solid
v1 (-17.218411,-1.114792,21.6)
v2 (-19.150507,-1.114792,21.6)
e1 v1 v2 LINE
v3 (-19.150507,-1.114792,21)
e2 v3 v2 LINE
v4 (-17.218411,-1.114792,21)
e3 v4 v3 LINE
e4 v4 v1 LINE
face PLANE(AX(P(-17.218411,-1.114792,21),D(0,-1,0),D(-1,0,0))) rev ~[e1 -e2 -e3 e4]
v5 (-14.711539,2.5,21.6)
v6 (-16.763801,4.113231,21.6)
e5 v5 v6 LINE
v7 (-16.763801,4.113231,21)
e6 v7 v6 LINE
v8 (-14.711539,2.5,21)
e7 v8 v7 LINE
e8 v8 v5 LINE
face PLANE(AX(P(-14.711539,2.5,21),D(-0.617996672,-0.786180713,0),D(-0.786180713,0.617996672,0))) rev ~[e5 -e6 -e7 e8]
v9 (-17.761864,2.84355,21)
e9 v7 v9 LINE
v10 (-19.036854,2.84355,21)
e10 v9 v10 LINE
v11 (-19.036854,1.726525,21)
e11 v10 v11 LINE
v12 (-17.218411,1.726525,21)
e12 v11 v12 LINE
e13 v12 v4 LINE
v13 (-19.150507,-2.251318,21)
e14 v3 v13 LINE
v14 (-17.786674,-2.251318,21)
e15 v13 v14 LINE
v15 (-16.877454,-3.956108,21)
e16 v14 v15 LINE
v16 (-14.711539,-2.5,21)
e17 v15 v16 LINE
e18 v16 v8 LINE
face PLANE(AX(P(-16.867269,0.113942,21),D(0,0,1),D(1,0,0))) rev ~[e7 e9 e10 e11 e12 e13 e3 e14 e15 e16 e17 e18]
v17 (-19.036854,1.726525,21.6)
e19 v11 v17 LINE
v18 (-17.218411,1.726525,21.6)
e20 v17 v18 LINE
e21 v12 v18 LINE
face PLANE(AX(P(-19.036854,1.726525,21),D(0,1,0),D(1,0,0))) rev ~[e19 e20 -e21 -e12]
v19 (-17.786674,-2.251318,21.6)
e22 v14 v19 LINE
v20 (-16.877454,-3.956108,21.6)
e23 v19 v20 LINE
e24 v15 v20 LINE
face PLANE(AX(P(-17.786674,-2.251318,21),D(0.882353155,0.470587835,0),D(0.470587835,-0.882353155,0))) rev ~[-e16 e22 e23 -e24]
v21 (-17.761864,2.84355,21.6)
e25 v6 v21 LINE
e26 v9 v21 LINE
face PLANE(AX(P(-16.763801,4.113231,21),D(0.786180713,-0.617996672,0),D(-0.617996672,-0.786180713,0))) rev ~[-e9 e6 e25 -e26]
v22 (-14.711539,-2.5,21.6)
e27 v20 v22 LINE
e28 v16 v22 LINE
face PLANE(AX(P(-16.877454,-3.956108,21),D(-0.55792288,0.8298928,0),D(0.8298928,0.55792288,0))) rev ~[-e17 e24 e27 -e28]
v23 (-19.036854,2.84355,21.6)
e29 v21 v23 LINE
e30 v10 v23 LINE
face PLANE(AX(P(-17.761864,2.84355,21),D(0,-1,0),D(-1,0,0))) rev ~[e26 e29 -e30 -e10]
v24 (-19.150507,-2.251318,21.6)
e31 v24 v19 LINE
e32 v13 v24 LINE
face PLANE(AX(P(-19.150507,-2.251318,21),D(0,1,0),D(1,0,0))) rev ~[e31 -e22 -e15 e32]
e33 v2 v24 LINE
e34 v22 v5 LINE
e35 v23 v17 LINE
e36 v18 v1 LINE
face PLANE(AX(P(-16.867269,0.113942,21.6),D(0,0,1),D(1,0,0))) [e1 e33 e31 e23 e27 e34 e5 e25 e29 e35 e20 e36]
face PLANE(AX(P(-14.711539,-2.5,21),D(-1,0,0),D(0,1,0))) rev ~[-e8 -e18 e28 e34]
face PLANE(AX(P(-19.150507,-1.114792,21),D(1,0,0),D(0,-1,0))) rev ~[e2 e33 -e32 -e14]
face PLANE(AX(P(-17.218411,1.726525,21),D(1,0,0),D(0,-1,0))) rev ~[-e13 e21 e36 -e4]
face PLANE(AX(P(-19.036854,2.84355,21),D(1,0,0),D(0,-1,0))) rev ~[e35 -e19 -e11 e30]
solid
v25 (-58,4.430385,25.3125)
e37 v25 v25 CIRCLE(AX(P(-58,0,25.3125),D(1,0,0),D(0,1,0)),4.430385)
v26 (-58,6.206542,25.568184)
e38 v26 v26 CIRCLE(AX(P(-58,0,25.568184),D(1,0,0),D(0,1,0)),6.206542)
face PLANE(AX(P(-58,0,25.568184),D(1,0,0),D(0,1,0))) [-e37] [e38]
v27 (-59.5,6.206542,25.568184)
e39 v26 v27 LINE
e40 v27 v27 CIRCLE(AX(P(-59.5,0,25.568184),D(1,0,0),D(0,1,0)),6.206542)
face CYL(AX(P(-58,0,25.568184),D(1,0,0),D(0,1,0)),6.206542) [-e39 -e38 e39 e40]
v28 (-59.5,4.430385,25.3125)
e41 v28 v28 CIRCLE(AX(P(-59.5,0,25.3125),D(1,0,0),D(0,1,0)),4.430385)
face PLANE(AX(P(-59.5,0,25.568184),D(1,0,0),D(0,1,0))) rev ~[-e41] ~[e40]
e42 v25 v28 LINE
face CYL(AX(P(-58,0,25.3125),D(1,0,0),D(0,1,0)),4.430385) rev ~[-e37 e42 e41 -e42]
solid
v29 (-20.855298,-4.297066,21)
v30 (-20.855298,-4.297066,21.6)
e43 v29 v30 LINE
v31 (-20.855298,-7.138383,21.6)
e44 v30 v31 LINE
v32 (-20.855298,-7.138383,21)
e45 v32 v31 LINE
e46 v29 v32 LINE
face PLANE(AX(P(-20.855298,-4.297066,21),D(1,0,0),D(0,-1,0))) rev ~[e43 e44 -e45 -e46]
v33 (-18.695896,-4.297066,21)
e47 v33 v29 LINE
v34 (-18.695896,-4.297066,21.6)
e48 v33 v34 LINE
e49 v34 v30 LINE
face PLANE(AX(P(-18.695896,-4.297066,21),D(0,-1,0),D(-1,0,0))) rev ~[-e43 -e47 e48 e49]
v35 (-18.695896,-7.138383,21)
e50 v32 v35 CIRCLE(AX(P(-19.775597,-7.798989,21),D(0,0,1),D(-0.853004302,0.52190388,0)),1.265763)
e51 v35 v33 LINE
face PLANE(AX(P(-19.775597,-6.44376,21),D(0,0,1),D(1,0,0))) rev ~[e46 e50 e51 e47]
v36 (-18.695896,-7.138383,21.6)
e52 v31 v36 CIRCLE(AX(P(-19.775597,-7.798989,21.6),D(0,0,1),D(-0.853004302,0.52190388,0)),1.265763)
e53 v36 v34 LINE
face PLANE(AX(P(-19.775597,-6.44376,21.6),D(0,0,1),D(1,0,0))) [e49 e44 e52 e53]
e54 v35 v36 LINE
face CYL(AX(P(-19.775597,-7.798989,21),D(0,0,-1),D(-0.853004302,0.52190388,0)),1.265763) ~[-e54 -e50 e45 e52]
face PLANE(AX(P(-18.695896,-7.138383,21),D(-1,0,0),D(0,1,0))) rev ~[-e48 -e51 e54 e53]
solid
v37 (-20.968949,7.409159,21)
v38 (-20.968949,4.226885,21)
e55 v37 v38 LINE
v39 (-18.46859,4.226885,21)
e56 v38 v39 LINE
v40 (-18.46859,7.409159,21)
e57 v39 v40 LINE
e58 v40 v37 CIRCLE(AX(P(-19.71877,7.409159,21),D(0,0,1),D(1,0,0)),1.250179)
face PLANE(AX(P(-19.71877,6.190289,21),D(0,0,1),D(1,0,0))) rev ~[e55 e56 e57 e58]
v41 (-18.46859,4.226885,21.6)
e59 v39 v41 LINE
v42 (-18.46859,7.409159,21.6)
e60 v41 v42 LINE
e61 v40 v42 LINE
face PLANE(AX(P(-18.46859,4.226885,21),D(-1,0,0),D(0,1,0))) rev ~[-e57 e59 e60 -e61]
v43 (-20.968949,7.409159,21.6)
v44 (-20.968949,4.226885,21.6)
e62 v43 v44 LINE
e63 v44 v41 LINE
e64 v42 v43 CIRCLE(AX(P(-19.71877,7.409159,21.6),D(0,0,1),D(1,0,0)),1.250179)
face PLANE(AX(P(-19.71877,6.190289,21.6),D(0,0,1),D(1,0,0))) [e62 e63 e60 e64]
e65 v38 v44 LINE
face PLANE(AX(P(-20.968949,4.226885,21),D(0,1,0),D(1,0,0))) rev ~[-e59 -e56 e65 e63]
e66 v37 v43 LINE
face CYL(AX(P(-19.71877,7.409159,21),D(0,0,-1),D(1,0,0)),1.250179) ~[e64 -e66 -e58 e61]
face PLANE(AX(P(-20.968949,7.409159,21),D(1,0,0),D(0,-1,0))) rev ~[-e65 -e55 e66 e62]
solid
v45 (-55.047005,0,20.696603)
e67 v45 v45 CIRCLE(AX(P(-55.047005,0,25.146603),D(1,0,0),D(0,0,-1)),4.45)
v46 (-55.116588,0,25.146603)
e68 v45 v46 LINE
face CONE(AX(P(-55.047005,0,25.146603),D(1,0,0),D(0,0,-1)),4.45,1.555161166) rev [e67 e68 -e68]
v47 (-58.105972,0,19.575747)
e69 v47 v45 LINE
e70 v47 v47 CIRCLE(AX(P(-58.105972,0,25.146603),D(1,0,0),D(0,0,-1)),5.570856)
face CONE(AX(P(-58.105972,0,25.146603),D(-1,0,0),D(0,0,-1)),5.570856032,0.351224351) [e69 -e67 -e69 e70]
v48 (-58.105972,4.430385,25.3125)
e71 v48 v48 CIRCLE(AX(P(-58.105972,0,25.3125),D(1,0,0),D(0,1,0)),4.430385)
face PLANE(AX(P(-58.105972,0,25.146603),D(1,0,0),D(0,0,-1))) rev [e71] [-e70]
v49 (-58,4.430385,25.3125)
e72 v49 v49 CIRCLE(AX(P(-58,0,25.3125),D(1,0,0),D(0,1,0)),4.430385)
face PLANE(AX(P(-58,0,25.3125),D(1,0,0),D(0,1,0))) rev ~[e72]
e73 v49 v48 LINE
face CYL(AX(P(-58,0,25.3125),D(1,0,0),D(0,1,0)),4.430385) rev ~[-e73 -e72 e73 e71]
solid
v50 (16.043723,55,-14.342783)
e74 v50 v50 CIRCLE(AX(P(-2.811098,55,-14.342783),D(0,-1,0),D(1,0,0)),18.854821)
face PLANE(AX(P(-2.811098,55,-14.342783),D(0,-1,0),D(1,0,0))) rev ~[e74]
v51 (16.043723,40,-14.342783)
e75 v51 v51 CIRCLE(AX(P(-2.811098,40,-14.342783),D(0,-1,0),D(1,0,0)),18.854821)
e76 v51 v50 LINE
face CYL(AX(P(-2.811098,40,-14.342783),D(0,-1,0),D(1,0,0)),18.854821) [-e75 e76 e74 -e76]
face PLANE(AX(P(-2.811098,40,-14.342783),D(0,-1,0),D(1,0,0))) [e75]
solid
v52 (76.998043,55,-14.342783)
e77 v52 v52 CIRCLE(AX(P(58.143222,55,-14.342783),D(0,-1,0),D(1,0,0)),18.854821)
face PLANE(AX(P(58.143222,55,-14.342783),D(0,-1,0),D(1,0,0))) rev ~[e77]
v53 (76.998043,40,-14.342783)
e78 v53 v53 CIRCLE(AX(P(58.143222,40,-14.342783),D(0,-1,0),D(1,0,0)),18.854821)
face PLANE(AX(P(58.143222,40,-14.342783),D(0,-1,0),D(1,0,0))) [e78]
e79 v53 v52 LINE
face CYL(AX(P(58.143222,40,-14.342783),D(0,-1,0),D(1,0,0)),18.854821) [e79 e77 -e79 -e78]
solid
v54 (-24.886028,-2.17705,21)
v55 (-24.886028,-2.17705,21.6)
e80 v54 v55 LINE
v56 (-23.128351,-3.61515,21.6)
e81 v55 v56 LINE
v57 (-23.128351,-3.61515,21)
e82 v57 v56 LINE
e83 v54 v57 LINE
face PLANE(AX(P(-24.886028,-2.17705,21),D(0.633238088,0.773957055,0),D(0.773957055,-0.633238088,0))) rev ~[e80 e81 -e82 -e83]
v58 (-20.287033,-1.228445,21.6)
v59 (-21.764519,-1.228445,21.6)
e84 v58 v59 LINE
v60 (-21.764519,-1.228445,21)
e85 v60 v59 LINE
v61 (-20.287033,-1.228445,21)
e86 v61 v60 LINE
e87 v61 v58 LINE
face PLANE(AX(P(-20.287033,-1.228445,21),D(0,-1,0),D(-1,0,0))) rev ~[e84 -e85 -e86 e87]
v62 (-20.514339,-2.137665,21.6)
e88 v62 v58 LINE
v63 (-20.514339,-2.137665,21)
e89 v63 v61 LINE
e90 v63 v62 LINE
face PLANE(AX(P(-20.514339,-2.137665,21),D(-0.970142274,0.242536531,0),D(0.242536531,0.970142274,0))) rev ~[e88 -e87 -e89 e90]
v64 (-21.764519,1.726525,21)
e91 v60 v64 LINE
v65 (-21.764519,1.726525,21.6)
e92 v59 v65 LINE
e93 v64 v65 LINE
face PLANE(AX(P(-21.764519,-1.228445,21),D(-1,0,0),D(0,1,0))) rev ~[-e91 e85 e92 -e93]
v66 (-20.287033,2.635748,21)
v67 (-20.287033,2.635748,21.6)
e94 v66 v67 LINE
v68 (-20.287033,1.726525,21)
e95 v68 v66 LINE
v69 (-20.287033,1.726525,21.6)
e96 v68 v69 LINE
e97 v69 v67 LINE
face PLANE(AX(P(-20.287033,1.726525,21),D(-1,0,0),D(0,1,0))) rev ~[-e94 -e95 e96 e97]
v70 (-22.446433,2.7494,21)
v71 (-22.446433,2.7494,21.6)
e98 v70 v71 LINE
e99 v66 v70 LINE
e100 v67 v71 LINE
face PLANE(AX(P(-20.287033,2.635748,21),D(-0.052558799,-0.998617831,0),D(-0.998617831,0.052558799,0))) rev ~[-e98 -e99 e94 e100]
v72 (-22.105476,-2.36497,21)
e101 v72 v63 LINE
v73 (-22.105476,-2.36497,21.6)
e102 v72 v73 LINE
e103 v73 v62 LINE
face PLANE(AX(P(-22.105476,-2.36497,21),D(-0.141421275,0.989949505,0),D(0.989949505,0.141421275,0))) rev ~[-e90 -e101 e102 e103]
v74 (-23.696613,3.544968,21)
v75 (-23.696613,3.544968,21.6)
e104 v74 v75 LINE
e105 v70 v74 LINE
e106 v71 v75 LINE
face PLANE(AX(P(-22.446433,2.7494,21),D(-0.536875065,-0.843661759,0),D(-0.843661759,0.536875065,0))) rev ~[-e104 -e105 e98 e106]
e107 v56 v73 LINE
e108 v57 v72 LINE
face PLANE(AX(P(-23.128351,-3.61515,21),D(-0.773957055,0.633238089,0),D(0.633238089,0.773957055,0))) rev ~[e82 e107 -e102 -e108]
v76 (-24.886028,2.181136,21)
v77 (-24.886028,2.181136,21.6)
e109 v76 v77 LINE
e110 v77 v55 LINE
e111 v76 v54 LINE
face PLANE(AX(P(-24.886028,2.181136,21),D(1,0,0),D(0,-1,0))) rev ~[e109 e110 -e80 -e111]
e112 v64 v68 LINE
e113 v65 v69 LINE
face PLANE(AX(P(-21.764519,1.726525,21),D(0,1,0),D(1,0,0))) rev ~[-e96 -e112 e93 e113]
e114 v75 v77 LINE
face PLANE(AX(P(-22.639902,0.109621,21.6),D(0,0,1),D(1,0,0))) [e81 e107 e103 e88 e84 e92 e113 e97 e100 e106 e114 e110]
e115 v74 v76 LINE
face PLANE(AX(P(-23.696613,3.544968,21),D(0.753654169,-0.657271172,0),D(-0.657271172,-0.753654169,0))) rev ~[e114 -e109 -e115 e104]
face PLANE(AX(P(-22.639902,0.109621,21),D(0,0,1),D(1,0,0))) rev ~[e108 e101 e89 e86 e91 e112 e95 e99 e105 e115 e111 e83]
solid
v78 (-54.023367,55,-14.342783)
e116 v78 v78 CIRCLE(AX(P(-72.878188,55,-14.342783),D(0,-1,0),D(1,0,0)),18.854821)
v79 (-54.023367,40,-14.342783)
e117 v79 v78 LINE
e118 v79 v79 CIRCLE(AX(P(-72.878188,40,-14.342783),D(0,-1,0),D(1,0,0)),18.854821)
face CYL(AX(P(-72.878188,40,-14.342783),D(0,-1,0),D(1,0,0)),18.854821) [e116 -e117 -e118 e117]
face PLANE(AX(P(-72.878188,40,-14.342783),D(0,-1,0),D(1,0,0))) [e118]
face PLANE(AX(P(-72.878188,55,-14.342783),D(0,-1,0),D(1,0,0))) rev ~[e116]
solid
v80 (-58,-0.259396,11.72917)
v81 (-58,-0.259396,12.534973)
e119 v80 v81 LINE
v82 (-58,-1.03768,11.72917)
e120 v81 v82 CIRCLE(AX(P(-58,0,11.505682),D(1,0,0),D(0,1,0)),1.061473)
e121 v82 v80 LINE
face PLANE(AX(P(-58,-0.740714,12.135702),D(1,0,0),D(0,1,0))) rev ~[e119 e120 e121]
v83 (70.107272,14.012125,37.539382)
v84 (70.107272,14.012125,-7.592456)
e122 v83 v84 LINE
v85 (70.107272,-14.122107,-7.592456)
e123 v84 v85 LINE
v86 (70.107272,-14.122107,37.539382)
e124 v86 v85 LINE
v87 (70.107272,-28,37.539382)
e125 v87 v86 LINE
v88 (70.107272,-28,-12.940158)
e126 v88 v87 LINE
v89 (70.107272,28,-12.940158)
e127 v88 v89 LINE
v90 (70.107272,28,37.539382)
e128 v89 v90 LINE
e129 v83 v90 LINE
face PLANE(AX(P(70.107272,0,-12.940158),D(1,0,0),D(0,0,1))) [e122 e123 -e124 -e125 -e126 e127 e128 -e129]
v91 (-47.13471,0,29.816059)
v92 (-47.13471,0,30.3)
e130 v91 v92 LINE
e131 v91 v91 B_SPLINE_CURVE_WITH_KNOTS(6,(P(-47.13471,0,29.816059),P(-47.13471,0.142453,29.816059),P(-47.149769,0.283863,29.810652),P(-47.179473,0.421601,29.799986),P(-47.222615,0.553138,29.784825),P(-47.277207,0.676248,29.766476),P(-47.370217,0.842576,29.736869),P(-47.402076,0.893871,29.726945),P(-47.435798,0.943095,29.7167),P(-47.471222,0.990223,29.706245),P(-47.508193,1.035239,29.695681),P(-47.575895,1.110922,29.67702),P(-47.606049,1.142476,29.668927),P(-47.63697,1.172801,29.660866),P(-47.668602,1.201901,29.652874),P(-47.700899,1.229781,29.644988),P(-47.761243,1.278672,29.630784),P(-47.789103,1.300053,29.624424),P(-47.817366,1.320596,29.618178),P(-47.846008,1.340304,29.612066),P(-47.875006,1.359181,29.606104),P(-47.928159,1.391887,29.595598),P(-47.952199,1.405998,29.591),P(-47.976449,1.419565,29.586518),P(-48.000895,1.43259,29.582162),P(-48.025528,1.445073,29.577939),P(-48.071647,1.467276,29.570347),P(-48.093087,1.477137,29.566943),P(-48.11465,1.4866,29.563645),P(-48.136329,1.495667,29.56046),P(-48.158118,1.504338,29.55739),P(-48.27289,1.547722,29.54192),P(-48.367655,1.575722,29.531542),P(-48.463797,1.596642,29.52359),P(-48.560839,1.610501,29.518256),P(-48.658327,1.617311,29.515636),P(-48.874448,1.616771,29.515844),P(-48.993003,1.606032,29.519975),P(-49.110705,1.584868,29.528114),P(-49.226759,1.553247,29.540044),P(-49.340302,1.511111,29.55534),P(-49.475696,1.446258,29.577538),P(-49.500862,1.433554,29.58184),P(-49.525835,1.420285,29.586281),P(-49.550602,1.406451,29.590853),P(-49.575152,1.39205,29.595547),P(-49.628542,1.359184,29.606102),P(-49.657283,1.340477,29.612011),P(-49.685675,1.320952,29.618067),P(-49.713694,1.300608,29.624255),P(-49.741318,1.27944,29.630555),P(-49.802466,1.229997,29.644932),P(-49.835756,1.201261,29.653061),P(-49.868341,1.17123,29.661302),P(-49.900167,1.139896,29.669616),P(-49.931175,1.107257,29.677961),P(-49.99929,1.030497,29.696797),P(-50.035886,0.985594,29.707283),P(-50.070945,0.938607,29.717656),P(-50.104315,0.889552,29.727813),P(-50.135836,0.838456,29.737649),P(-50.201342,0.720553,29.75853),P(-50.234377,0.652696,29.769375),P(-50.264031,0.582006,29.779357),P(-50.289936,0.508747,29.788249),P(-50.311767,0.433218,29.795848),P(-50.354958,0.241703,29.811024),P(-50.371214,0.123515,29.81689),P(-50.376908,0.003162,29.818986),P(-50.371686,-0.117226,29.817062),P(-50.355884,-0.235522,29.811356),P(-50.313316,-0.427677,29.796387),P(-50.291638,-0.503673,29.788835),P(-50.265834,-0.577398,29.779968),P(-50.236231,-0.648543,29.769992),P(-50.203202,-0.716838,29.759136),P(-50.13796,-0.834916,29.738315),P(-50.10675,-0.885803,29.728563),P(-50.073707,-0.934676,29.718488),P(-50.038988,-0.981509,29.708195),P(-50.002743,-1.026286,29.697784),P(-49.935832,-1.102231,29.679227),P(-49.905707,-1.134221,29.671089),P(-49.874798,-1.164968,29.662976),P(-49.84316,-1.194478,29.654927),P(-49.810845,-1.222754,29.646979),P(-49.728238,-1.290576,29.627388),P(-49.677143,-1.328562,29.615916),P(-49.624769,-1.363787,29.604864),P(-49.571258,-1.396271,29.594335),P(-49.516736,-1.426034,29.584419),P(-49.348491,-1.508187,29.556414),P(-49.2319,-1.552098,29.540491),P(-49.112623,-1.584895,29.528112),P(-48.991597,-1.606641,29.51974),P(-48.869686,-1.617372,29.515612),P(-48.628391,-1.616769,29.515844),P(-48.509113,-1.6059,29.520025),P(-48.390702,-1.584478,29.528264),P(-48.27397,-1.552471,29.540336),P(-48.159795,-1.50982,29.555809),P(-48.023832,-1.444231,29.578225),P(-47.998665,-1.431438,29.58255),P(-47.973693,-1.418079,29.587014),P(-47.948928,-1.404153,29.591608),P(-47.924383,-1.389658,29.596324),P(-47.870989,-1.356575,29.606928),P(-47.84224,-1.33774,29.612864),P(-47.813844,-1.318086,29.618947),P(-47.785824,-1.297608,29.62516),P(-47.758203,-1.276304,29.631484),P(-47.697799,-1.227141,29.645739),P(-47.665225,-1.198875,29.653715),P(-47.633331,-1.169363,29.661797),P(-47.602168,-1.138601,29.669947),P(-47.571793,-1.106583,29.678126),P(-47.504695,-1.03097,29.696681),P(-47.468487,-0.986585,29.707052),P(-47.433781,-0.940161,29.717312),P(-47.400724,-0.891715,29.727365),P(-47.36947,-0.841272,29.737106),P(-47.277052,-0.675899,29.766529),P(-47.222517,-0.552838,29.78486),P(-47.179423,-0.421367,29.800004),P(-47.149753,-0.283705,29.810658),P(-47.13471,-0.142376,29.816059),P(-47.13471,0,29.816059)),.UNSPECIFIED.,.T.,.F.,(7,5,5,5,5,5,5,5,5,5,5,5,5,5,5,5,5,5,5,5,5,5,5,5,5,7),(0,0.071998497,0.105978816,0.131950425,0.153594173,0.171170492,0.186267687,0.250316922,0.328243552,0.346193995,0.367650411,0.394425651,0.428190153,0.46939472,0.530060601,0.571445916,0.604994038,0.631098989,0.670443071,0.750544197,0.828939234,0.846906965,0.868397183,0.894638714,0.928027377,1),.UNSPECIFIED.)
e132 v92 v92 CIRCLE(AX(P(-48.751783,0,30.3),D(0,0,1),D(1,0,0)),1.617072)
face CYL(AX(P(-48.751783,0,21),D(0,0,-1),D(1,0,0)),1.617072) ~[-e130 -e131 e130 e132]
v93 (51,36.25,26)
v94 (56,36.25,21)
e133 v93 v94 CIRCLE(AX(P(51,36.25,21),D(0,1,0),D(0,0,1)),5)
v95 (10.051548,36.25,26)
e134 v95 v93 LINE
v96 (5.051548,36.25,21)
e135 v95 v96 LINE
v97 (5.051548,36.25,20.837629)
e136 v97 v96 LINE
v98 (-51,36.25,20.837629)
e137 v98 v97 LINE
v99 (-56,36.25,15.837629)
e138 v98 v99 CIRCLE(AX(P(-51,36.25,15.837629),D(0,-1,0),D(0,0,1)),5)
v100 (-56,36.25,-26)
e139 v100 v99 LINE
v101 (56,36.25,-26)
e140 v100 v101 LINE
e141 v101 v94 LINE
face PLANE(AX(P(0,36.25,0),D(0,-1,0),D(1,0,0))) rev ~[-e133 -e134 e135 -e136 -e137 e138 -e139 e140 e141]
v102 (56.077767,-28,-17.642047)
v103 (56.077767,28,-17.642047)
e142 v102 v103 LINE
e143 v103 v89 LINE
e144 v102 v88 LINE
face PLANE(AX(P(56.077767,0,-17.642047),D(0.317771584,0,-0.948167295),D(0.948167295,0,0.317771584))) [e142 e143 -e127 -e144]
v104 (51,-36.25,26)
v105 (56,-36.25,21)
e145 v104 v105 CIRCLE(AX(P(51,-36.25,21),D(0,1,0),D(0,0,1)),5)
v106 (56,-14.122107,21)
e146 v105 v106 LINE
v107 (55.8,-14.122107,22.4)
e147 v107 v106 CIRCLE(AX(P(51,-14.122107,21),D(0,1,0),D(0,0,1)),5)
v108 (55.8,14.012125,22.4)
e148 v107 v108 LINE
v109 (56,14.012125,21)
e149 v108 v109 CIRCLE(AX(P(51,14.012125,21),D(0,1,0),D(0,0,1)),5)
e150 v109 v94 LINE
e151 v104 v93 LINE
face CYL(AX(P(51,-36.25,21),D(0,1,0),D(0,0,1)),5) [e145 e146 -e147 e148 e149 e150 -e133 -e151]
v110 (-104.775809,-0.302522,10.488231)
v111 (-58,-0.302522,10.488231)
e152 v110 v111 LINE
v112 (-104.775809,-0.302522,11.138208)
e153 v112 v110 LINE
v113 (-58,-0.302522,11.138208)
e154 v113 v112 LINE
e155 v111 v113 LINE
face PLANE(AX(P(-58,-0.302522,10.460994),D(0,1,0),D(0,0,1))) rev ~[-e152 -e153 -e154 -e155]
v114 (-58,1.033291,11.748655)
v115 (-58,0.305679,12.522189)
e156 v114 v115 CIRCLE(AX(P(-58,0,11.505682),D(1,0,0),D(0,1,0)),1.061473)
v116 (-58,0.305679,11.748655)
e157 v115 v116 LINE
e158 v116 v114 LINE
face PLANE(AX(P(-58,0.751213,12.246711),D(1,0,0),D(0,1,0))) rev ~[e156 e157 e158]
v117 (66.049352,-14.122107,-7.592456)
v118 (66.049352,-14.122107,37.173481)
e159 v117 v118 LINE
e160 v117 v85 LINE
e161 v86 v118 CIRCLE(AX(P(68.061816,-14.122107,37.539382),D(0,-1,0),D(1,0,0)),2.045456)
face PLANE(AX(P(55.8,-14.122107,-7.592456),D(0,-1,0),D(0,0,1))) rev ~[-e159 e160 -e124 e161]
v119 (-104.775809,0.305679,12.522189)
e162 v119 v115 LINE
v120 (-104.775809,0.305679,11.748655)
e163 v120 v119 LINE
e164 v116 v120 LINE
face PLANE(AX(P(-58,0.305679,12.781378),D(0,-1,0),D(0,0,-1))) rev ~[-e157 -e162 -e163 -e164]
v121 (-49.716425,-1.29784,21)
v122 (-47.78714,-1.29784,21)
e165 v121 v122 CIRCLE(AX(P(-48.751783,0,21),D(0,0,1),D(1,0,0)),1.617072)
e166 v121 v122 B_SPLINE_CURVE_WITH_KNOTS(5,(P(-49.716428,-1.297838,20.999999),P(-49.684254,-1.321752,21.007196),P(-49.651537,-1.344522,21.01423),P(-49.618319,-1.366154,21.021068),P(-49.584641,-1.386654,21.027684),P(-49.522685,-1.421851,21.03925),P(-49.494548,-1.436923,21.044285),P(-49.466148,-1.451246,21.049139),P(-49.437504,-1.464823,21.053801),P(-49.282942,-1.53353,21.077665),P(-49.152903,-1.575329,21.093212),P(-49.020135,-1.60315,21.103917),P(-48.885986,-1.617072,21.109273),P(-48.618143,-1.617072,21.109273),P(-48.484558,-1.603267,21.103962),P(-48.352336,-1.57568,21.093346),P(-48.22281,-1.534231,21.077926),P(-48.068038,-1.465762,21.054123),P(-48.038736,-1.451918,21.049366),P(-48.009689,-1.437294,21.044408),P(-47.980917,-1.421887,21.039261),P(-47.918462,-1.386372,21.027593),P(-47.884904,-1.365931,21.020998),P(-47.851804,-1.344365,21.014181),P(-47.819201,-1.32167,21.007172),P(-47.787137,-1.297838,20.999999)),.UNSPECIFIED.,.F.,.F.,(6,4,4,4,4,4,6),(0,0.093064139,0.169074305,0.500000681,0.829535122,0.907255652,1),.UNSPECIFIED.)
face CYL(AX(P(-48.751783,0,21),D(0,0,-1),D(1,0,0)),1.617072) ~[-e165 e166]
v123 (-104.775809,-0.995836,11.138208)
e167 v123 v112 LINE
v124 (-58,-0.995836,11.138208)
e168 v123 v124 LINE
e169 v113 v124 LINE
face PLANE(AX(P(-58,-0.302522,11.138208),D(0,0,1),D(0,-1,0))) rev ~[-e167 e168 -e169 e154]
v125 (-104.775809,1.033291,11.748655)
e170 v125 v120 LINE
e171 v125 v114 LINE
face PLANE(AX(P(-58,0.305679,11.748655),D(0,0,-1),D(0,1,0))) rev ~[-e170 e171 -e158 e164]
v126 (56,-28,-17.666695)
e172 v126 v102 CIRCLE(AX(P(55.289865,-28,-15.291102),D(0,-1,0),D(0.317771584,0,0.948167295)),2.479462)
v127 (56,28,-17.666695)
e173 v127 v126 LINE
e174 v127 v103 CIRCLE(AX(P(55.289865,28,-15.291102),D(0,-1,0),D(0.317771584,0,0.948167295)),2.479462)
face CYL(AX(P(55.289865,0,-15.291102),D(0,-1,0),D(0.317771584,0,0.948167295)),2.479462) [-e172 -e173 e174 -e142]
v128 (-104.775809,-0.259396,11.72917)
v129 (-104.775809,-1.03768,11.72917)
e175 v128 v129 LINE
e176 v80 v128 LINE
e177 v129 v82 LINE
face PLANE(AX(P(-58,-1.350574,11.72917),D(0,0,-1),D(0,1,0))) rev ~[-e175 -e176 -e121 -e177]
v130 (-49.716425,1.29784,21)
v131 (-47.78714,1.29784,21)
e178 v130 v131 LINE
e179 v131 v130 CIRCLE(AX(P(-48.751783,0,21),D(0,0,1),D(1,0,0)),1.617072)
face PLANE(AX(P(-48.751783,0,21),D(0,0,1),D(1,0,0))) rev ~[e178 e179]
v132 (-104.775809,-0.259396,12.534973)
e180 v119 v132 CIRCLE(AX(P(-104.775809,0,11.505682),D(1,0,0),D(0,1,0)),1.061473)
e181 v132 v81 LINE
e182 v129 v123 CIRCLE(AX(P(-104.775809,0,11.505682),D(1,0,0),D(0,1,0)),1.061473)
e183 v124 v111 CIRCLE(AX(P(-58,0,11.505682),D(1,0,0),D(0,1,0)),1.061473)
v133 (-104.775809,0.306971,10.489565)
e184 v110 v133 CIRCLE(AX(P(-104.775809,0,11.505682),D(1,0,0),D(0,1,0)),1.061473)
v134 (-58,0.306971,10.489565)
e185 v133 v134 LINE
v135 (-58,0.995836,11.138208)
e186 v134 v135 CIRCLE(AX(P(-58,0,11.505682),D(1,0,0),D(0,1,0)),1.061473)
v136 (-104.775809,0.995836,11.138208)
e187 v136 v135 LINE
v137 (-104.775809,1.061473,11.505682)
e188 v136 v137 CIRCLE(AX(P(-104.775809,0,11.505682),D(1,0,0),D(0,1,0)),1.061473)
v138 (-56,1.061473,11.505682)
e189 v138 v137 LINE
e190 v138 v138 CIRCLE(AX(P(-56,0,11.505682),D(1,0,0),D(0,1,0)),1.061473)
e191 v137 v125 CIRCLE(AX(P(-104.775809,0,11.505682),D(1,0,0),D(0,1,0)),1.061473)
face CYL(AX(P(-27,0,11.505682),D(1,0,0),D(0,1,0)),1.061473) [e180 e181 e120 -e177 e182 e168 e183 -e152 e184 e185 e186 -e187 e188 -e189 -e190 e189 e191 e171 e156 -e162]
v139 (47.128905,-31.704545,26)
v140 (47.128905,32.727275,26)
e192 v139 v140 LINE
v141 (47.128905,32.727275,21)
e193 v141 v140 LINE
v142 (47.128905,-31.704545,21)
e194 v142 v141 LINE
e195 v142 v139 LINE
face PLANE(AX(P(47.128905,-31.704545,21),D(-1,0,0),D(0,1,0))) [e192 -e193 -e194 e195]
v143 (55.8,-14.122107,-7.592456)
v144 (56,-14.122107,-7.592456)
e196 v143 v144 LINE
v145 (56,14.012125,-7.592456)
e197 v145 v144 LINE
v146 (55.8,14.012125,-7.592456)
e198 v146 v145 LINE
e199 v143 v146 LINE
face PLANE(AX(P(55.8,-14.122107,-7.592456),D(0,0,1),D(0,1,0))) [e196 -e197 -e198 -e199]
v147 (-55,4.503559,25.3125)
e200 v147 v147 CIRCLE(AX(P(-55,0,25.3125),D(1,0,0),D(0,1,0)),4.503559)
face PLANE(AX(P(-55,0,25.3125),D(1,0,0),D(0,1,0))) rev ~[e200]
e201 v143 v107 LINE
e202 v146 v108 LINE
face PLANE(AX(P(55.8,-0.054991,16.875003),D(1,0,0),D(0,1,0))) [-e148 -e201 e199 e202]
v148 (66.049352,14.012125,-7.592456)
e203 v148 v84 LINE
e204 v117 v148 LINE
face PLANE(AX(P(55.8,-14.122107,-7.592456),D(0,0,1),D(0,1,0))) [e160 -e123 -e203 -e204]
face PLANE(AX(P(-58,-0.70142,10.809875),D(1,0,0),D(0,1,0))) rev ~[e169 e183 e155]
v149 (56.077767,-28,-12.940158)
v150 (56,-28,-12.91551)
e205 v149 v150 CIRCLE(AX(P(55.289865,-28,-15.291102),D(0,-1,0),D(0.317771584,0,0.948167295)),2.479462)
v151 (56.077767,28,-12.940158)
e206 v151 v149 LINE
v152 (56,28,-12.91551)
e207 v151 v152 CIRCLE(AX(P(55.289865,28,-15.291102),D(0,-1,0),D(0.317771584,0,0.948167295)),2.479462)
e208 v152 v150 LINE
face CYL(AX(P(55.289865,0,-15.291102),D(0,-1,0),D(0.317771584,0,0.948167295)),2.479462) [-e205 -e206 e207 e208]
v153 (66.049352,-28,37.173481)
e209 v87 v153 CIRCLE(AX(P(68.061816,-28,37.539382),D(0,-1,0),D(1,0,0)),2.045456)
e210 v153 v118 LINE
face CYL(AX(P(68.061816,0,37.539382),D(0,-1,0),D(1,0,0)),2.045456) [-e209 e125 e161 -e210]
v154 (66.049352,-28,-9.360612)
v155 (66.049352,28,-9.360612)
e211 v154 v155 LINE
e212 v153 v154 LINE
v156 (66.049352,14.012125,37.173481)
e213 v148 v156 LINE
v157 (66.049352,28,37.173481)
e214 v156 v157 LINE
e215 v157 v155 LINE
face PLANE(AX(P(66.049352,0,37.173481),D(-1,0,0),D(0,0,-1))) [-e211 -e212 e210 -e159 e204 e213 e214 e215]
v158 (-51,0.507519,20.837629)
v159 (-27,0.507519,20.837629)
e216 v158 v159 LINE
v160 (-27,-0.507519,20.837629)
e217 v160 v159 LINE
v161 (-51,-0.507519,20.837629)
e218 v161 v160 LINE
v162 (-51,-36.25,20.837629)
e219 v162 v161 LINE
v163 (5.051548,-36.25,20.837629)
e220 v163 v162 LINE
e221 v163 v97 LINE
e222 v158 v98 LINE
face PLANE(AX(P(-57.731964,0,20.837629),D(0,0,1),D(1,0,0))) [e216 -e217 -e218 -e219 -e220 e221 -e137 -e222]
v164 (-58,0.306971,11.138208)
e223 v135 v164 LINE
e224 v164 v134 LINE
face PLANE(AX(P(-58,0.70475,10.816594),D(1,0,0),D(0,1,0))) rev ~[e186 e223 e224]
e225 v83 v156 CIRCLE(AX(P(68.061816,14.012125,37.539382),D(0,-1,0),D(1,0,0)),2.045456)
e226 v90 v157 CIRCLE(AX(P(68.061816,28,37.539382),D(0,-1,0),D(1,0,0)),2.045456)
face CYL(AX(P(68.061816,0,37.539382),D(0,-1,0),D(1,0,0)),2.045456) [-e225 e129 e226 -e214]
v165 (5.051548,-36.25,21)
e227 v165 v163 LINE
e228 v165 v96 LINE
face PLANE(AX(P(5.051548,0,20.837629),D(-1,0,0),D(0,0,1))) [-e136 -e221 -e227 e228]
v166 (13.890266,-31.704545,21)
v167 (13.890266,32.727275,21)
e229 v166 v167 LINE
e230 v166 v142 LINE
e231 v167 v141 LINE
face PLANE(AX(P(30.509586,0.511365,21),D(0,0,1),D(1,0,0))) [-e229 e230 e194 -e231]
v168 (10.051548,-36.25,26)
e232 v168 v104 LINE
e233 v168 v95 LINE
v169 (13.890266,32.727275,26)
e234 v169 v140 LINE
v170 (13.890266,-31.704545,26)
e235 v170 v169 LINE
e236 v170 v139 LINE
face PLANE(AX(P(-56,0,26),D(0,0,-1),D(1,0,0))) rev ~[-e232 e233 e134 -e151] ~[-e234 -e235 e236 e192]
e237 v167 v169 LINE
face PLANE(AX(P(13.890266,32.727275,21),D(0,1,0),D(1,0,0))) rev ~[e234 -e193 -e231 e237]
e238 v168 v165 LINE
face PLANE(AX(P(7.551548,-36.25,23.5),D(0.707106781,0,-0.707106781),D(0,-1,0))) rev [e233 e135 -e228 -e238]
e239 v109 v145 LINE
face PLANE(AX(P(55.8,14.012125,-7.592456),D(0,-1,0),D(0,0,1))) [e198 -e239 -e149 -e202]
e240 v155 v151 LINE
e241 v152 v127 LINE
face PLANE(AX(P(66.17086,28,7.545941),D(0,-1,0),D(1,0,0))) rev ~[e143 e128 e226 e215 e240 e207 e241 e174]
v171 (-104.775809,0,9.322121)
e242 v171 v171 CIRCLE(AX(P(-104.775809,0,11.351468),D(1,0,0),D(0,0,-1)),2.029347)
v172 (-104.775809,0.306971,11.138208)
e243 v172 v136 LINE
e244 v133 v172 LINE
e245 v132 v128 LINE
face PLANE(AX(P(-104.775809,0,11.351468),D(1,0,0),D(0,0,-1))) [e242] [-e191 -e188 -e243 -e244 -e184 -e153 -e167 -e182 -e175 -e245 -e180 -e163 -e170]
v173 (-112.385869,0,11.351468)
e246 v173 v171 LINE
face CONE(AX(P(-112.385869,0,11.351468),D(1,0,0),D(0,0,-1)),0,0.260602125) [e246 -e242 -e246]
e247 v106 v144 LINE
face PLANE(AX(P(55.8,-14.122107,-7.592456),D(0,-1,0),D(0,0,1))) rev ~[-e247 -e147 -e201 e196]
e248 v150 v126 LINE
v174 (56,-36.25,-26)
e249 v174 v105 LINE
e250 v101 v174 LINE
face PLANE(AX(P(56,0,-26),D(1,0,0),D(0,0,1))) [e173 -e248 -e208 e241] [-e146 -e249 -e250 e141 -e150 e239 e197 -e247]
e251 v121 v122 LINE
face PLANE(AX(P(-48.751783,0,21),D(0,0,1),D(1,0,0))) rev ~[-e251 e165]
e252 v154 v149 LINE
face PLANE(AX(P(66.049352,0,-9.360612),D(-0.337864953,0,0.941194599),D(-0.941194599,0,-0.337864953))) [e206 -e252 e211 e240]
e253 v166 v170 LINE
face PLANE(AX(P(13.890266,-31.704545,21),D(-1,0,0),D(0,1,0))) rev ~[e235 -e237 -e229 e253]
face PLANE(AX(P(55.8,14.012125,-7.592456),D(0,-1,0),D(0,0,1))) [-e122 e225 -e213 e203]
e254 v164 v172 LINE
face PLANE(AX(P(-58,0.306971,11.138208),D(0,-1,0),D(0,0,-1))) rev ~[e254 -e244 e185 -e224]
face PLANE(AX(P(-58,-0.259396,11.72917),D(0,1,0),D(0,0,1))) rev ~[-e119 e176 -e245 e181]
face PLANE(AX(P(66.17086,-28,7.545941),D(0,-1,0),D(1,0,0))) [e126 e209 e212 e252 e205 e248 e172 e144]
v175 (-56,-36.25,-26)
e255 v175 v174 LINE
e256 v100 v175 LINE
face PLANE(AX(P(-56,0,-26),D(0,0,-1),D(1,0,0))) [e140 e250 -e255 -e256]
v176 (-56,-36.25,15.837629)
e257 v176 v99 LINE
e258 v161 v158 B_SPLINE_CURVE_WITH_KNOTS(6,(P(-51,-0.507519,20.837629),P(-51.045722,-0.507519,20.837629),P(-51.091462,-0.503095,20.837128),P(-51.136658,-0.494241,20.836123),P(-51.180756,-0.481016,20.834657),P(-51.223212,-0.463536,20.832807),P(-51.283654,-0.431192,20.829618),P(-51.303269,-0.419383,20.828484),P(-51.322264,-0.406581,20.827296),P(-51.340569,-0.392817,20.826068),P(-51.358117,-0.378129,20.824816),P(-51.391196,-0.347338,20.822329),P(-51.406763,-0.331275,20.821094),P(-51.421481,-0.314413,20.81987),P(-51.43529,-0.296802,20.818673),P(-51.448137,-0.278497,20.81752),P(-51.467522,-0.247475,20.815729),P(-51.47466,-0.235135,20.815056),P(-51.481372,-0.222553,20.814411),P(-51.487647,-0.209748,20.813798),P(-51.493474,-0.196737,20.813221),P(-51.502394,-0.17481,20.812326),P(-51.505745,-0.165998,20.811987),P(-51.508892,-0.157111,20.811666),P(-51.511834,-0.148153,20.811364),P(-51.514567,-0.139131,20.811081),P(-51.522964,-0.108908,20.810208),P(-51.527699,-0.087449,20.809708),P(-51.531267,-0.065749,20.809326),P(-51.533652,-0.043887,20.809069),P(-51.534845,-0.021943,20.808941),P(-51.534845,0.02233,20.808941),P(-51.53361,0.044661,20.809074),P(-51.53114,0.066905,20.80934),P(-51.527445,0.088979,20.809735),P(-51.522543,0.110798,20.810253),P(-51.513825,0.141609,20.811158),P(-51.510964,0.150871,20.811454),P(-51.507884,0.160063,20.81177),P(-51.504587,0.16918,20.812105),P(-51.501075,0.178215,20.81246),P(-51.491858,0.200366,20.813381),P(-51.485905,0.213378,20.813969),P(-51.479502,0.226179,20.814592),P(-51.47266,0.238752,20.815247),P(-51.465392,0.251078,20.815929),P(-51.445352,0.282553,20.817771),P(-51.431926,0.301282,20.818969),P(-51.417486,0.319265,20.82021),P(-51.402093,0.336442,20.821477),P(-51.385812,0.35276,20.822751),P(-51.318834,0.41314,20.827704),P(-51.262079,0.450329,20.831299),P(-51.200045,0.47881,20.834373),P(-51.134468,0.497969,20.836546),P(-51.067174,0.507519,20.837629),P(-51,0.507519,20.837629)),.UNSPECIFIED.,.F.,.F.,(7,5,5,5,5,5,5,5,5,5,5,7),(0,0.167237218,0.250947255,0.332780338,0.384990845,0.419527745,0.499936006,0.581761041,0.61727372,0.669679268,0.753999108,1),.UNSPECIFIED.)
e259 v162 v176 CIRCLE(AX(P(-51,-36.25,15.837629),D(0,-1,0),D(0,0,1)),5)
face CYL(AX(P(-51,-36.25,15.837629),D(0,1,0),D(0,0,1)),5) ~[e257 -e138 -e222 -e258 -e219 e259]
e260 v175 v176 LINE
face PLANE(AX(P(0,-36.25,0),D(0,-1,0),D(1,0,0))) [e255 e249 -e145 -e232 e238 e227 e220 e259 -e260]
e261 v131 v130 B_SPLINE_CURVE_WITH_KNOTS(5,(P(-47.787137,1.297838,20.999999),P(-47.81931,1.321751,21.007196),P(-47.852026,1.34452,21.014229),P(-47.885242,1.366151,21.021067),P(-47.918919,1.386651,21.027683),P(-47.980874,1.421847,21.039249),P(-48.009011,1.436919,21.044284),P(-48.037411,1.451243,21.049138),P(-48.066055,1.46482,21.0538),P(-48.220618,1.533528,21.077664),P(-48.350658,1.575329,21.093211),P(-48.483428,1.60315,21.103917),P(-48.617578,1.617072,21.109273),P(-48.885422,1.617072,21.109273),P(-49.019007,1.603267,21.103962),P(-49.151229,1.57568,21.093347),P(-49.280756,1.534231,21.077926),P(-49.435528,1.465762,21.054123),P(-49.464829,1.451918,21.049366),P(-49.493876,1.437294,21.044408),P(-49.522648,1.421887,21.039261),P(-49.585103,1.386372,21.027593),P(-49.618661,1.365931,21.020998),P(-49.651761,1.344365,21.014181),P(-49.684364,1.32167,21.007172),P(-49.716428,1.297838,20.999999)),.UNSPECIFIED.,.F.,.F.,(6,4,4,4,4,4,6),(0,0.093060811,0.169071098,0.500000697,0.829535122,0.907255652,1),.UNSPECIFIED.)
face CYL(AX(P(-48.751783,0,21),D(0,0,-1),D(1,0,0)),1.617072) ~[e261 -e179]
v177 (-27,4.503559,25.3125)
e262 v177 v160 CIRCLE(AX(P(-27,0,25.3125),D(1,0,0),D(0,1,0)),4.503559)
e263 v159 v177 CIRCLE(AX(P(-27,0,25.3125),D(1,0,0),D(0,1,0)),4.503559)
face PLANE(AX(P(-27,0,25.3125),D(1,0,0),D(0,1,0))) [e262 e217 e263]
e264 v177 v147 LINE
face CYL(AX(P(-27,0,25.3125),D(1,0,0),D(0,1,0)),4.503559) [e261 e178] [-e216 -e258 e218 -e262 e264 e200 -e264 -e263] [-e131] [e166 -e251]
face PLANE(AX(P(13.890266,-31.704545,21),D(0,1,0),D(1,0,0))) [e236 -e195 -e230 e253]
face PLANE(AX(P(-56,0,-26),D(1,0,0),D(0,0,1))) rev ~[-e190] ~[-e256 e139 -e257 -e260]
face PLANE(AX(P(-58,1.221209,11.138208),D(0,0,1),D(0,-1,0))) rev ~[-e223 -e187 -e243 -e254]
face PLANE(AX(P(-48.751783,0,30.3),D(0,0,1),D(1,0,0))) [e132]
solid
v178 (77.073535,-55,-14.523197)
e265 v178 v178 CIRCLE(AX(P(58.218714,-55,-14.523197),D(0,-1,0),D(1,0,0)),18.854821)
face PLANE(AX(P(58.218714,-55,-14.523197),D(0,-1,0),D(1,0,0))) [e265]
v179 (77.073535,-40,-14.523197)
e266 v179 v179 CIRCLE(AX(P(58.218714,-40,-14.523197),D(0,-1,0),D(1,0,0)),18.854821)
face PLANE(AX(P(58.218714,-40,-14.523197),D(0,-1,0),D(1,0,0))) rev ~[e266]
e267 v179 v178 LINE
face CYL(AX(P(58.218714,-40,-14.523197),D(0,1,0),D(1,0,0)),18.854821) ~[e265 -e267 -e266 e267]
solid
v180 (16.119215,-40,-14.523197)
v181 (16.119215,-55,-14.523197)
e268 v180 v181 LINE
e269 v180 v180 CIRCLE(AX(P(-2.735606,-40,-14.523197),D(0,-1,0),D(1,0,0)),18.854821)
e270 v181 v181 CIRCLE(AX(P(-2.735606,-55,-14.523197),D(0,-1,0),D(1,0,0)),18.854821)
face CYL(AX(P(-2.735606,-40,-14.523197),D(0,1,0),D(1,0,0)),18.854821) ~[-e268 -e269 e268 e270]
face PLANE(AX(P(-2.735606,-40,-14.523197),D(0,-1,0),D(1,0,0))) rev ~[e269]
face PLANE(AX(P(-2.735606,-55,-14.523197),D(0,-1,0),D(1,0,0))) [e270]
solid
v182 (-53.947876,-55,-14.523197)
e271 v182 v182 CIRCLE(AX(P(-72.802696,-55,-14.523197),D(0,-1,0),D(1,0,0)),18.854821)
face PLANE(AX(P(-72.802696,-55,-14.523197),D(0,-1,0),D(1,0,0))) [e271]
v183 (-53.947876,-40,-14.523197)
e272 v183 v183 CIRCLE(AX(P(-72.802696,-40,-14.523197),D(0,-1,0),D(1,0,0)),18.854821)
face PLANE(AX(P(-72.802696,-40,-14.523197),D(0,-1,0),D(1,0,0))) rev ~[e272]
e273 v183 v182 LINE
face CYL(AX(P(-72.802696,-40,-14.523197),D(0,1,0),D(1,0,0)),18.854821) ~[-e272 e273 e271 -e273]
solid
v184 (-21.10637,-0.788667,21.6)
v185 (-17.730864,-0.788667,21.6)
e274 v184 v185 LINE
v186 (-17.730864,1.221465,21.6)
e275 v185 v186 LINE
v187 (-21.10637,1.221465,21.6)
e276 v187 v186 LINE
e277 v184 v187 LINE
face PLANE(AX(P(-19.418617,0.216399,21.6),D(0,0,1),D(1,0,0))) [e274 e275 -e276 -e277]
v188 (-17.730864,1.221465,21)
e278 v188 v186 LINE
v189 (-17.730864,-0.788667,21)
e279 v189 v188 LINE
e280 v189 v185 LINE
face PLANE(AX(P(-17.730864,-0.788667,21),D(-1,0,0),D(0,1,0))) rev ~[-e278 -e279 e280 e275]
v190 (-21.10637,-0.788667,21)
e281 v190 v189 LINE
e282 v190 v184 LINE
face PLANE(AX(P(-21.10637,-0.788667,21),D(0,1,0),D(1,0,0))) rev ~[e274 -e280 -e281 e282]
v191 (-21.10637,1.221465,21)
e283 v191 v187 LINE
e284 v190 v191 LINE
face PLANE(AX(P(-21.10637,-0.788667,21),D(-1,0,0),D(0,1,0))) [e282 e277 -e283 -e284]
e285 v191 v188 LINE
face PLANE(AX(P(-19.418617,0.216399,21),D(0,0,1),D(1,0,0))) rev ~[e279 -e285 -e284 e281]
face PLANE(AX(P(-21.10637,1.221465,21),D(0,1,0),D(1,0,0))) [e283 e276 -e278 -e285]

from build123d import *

# Parameters (mm, degrees)
F0_W           = 112
F0_H           = 52
F1_DEPTH       = 36.25
F1_DEPTH_BACK  = 36.25
F2_W           = 62.7835113555
F2_H           = 8.2989688963
F3_DEPTH       = 40
F3_DEPTH_BACK  = 40
F4_SIZE        = 5
F5_R           = 5
F8_DEPTH       = 0.6
F9_W           = 3.3755060285
F9_H           = 2.0101326518
F10_DEPTH      = 0.6
F12_R          = 18.8548205179
F13_DEPTH      = 15
F19_R          = 18.8548205179
F20_DEPTH      = 15
F24_DEPTH      = 28
F24_DEPTH_BACK = 28
F26_W          = 28.1342324962
F26_H          = 48.9349166028
F27_DEPTH      = 25
F29_R          = 4.5035590708
F30_DEPTH      = 28
F32_R          = 6.2065419795
F33_DEPTH      = 1.5
F36_R          = 4.4303853292
F37_DEPTH      = 25
F38_R          = 1.617072427
F39_DEPTH      = 9.3
F40_W          = 33.2386381924
F40_H          = 64.4318200648
F41_DEPTH      = 25
F42_R          = 1.0614733058
F43_DEPTH      = 80
F45_DEPTH      = 90


# Not quite as in the source:
# - the program builds the solid bodies; features that only make, move or delete a surface that nothing else refers to are left out


with BuildPart() as f1:
    # F0 (on Front) → F1 (new body, two sides)
    with BuildSketch(Plane.XZ) as f1_sk:
        Rectangle(F0_W, F0_H)
    extrude(amount=F1_DEPTH)
    extrude(f1_sk.sketch, amount=-F1_DEPTH_BACK)

    # F2 (on Front) → F3 (cut, two sides)
    with BuildSketch(Plane.XZ) as f3_sk:
        with Locations((-26.3402080163, 24.9871136621)):
            Rectangle(F2_W, F2_H)
    extrude(amount=-F3_DEPTH, mode=Mode.SUBTRACT)
    extrude(f3_sk.sketch, amount=F3_DEPTH_BACK, mode=Mode.SUBTRACT)

    # F4
    f4_edges = [f1.edges().sort_by_distance(p)[0] for p in [
        (5.051548, 0, 26),
    ]]
    chamfer(f4_edges, length=F4_SIZE)

    # F5
    f5_edges = [f1.edges().sort_by_distance(p)[0] for p in [
        (56, 0, 26),
        (-56, 0, 20.837629),
    ]]
    fillet(f5_edges, radius=F5_R)

    # F23 (on Front) → F24 (join, two sides)
    with BuildSketch(Plane.XZ) as f24_sk:
        with BuildLine():
            Line((66.0493522882, -9.3606118894), (56.0777671635, -12.9401576556))
            ThreePointArc((56.0777671635, -12.9401576556), (52.810402565, -15.2911024559), (56.0777671635, -17.6420472562))
            Line((56.0777671635, -17.6420472562), (70.1072718896, -12.9401576556))
            Line((70.1072718896, -12.9401576556), (70.1072718896, 37.5393816017))
            ThreePointArc((70.1072718896, 37.5393816017), (67.878123137, 39.5765729642), (66.0493522882, 37.1734812074))
            Line((66.0493522882, 37.1734812074), (66.0493522882, -9.3606118894))
        make_face()
    extrude(amount=F24_DEPTH)
    extrude(f24_sk.sketch, amount=-F24_DEPTH_BACK)

    # F26 (on offset) → F27 (cut)
    with BuildSketch(Plane.YZ.offset(55.8)):
        with Locations((-0.0549908727, 16.8750025332)):
            Rectangle(F26_W, F26_H)
    extrude(amount=F27_DEPTH, mode=Mode.SUBTRACT)

    # F29 (on offset) → F30 (join)
    with BuildSketch(Plane.YZ.offset(-27)):
        with Locations((0, 25.3125000745)):
            Circle(F29_R)
    extrude(amount=-F30_DEPTH)

    # F38 (on offset) → F39 (join)
    with BuildSketch(Plane.XY.offset(21)):
        with Locations((-48.7517826259, 0)):
            Circle(F38_R)
    extrude(amount=F39_DEPTH)

    # F40 (on offset) → F41 (cut)
    with BuildSketch(Plane.XY.offset(21)):
        with Locations((30.5095855147, 0.5113650113)):
            Rectangle(F40_W, F40_H)
    extrude(amount=F41_DEPTH, mode=Mode.SUBTRACT)

    # F42 (on offset) → F43 (join)
    with BuildSketch(Plane.YZ.offset(-27)):
        with Locations((0, 11.5056820214)):
            Circle(F42_R)
    extrude(amount=-F43_DEPTH)

    # F44 (on offset) → F45 (cut)
    with BuildSketch(Plane.YZ.offset(-58)):
        Polygon((-0.9458741988, 10.3932730854), (-0.3025215992, 10.4609942064), (-0.3025215992, 11.1382082105), (-1.1828994611, 11.1382082105), align=None)
        Polygon((1.2212089496, 11.1382082105), (0.3069706145, 11.1382082105), (0.3069706145, 10.4609942064), (0.8487420273, 10.3594120592), align=None)
        Polygon((-1.3505744282, 11.729169637), (-0.2593955433, 11.729169637), (-0.2593955433, 12.6839512959), (-1.2141767656, 12.4306418002), (-1.2921184534, 12.0214503258), (-1.3505744282, 11.865567416), align=None)
        Polygon((1.1240632739, 12.7813778818), (0.3056792775, 12.7813778818), (0.3056792775, 11.7486547679), (1.2604609365, 11.7486547679), align=None)
    extrude(amount=-F45_DEPTH, mode=Mode.SUBTRACT)

    # F46 (on Front) → F47 (revolve)
    with BuildSketch(Plane.XZ):
        Polygon((-104.7758087516, 9.3221208081), (-104.7758087516, 11.3514680415), (-112.3858690262, 11.3514680415), align=None)
    revolve(axis=Axis((-108.5808388889, 0, 11.3514680415), (1, 0, 0)))


with BuildPart() as f8:
    # F7 (on offset) → F8 (new body)
    with BuildSketch(Plane.XY.offset(21)):
        Polygon((-14.7115389197, -2.5), (-14.7115389197, 0), (-14.7115389197, 2.5), (-16.7638007551, 4.1132308543), (-17.7618643205, 2.8435503501), (-19.036853686, 2.8435503501), (-19.036853686, 1.7265254864), (-17.2184109688, 1.7265254864), (-17.2184109688, -1.1147919577), (-19.150506705, -1.1147919577), (-19.150506705, -2.2513177246), (-17.7866742015, -2.2513177246), (-16.8774537742, -3.9561078884), align=None)
    extrude(amount=F8_DEPTH)


with BuildPart() as f8b:
    # F7 (on offset) → F8, piece 2 (new body)
    with BuildSketch(Plane.XY.offset(21)):
        Polygon((-21.7645186931, 1.7265254864), (-20.2870331705, 1.7265254864), (-20.2870331705, 2.63574766), (-22.4464330822, 2.7494002134), (-23.6966125667, 3.5449680872), (-24.8860276497, 2.1811358165), (-24.8860276497, -2.1770501812), (-23.1283511966, -3.6151502281), (-22.1054758877, -2.364970278), (-20.5143392086, -2.1376651712), (-20.2870331705, -1.2284446275), (-21.7645186931, -1.2284446275), align=None)
    extrude(amount=F8_DEPTH)


with BuildPart() as f8c:
    # F7 (on offset) → F8, piece 3 (new body)
    with BuildSketch(Plane.XY.offset(21)):
        with BuildLine():
            Line((-18.6958964914, -7.1383831091), (-18.6958964914, -4.2970655486))
            Line((-18.6958964914, -4.2970655486), (-20.8552982658, -4.2970655486))
            Line((-20.8552982658, -4.2970655486), (-20.8552982658, -7.1383831091))
            ThreePointArc((-20.8552982658, -7.1383831091), (-19.7755973786, -9.0647520211), (-18.6958964914, -7.1383831091))
        make_face()
    extrude(amount=F8_DEPTH)


with BuildPart() as f8d:
    # F7 (on offset) → F8, piece 4 (new body)
    with BuildSketch(Plane.XY.offset(21)):
        with BuildLine():
            Line((-20.9689494222, 4.2268852703), (-18.4685904533, 4.2268852703))
            Line((-18.4685904533, 4.2268852703), (-18.4685904533, 7.4091586284))
            ThreePointArc((-18.4685904533, 7.4091586284), (-19.7187699378, 8.6593381129), (-20.9689494222, 7.4091586284))
            Line((-20.9689494222, 7.4091586284), (-20.9689494222, 4.2268852703))
        make_face()
    extrude(amount=F8_DEPTH)


with BuildPart() as f10:
    # F9 (on offset) → F10 (new body)
    with BuildSketch(Plane.XY.offset(21)):
        with Locations((-19.4186167791, 0.2163989702)):
            Rectangle(F9_W, F9_H)
    extrude(amount=F10_DEPTH)


with BuildPart() as f13:
    # F12 (on offset) → F13 (new body)
    with BuildSketch(Plane.XZ.offset(40)):
        with Locations((-72.8026961442, -14.5231969655)):
            Circle(F12_R)
    extrude(amount=F13_DEPTH)


with BuildPart() as f13b:
    # F12 (on offset) → F13, piece 2 (new body)
    with BuildSketch(Plane.XZ.offset(40)):
        with Locations((-2.735605929, -14.5231969655)):
            Circle(F12_R)
    extrude(amount=F13_DEPTH)


with BuildPart() as f13c:
    # F12 (on offset) → F13, piece 3 (new body)
    with BuildSketch(Plane.XZ.offset(40)):
        with Locations((58.2187140826, -14.5231969655)):
            Circle(F12_R)
    extrude(amount=F13_DEPTH)


with BuildPart() as f20:
    # F19 (on offset) → F20 (new body)
    with BuildSketch(Plane.XZ.offset(-40)):
        with Locations((-72.8781877551, -14.3427830189)):
            Circle(F19_R)
    extrude(amount=-F20_DEPTH)


with BuildPart() as f20b:
    # F19 (on offset) → F20, piece 2 (new body)
    with BuildSketch(Plane.XZ.offset(-40)):
        with Locations((-2.81109754, -14.3427830189)):
            Circle(F19_R)
    extrude(amount=-F20_DEPTH)


with BuildPart() as f20c:
    # F19 (on offset) → F20, piece 3 (new body)
    with BuildSketch(Plane.XZ.offset(-40)):
        with Locations((58.1432224717, -14.3427830189)):
            Circle(F19_R)
    extrude(amount=-F20_DEPTH)


with BuildPart() as f33:
    # F32 (on offset) → F33 (new body)
    with BuildSketch(Plane.YZ.offset(-58)):
        with Locations((0, 25.5681835115)):
            Circle(F32_R)
    extrude(amount=-F33_DEPTH)


with BuildPart() as f35:
    # F34 (on Front) → F35 (revolve)
    with BuildSketch(Plane.XZ):
        Polygon((-58.1059716642, 19.5757467947), (-55.047005415, 20.6966028265), (-55.116587552, 25.1466028265), (-58.1059716642, 25.1466028265), align=None)
    revolve(axis=Axis((-56.6112796081, 0, 25.1466028265), (1, 0, 0)))


with BuildPart() as f37_tool:
    # F36 (on offset) → F37 (new body)
    with BuildSketch(Plane.YZ.offset(-58)):
        with Locations((0, 25.3125000745)):
            Circle(F36_R)
    extrude(amount=-F37_DEPTH)


with BuildPart() as f33_1:
    add(f33.part)

    # F37: cut by f37_tool
    add(f37_tool.part, mode=Mode.SUBTRACT)


with BuildPart() as f35_1:
    add(f35.part)

    # F37: cut by f37_tool
    add(f37_tool.part, mode=Mode.SUBTRACT)


solid = Compound([f1.part, f8.part, f8b.part, f8c.part, f8d.part, f10.part, f13.part, f13b.part, f13c.part, f20.part, f20b.part, f20c.part, f33_1.part, f35_1.part])
